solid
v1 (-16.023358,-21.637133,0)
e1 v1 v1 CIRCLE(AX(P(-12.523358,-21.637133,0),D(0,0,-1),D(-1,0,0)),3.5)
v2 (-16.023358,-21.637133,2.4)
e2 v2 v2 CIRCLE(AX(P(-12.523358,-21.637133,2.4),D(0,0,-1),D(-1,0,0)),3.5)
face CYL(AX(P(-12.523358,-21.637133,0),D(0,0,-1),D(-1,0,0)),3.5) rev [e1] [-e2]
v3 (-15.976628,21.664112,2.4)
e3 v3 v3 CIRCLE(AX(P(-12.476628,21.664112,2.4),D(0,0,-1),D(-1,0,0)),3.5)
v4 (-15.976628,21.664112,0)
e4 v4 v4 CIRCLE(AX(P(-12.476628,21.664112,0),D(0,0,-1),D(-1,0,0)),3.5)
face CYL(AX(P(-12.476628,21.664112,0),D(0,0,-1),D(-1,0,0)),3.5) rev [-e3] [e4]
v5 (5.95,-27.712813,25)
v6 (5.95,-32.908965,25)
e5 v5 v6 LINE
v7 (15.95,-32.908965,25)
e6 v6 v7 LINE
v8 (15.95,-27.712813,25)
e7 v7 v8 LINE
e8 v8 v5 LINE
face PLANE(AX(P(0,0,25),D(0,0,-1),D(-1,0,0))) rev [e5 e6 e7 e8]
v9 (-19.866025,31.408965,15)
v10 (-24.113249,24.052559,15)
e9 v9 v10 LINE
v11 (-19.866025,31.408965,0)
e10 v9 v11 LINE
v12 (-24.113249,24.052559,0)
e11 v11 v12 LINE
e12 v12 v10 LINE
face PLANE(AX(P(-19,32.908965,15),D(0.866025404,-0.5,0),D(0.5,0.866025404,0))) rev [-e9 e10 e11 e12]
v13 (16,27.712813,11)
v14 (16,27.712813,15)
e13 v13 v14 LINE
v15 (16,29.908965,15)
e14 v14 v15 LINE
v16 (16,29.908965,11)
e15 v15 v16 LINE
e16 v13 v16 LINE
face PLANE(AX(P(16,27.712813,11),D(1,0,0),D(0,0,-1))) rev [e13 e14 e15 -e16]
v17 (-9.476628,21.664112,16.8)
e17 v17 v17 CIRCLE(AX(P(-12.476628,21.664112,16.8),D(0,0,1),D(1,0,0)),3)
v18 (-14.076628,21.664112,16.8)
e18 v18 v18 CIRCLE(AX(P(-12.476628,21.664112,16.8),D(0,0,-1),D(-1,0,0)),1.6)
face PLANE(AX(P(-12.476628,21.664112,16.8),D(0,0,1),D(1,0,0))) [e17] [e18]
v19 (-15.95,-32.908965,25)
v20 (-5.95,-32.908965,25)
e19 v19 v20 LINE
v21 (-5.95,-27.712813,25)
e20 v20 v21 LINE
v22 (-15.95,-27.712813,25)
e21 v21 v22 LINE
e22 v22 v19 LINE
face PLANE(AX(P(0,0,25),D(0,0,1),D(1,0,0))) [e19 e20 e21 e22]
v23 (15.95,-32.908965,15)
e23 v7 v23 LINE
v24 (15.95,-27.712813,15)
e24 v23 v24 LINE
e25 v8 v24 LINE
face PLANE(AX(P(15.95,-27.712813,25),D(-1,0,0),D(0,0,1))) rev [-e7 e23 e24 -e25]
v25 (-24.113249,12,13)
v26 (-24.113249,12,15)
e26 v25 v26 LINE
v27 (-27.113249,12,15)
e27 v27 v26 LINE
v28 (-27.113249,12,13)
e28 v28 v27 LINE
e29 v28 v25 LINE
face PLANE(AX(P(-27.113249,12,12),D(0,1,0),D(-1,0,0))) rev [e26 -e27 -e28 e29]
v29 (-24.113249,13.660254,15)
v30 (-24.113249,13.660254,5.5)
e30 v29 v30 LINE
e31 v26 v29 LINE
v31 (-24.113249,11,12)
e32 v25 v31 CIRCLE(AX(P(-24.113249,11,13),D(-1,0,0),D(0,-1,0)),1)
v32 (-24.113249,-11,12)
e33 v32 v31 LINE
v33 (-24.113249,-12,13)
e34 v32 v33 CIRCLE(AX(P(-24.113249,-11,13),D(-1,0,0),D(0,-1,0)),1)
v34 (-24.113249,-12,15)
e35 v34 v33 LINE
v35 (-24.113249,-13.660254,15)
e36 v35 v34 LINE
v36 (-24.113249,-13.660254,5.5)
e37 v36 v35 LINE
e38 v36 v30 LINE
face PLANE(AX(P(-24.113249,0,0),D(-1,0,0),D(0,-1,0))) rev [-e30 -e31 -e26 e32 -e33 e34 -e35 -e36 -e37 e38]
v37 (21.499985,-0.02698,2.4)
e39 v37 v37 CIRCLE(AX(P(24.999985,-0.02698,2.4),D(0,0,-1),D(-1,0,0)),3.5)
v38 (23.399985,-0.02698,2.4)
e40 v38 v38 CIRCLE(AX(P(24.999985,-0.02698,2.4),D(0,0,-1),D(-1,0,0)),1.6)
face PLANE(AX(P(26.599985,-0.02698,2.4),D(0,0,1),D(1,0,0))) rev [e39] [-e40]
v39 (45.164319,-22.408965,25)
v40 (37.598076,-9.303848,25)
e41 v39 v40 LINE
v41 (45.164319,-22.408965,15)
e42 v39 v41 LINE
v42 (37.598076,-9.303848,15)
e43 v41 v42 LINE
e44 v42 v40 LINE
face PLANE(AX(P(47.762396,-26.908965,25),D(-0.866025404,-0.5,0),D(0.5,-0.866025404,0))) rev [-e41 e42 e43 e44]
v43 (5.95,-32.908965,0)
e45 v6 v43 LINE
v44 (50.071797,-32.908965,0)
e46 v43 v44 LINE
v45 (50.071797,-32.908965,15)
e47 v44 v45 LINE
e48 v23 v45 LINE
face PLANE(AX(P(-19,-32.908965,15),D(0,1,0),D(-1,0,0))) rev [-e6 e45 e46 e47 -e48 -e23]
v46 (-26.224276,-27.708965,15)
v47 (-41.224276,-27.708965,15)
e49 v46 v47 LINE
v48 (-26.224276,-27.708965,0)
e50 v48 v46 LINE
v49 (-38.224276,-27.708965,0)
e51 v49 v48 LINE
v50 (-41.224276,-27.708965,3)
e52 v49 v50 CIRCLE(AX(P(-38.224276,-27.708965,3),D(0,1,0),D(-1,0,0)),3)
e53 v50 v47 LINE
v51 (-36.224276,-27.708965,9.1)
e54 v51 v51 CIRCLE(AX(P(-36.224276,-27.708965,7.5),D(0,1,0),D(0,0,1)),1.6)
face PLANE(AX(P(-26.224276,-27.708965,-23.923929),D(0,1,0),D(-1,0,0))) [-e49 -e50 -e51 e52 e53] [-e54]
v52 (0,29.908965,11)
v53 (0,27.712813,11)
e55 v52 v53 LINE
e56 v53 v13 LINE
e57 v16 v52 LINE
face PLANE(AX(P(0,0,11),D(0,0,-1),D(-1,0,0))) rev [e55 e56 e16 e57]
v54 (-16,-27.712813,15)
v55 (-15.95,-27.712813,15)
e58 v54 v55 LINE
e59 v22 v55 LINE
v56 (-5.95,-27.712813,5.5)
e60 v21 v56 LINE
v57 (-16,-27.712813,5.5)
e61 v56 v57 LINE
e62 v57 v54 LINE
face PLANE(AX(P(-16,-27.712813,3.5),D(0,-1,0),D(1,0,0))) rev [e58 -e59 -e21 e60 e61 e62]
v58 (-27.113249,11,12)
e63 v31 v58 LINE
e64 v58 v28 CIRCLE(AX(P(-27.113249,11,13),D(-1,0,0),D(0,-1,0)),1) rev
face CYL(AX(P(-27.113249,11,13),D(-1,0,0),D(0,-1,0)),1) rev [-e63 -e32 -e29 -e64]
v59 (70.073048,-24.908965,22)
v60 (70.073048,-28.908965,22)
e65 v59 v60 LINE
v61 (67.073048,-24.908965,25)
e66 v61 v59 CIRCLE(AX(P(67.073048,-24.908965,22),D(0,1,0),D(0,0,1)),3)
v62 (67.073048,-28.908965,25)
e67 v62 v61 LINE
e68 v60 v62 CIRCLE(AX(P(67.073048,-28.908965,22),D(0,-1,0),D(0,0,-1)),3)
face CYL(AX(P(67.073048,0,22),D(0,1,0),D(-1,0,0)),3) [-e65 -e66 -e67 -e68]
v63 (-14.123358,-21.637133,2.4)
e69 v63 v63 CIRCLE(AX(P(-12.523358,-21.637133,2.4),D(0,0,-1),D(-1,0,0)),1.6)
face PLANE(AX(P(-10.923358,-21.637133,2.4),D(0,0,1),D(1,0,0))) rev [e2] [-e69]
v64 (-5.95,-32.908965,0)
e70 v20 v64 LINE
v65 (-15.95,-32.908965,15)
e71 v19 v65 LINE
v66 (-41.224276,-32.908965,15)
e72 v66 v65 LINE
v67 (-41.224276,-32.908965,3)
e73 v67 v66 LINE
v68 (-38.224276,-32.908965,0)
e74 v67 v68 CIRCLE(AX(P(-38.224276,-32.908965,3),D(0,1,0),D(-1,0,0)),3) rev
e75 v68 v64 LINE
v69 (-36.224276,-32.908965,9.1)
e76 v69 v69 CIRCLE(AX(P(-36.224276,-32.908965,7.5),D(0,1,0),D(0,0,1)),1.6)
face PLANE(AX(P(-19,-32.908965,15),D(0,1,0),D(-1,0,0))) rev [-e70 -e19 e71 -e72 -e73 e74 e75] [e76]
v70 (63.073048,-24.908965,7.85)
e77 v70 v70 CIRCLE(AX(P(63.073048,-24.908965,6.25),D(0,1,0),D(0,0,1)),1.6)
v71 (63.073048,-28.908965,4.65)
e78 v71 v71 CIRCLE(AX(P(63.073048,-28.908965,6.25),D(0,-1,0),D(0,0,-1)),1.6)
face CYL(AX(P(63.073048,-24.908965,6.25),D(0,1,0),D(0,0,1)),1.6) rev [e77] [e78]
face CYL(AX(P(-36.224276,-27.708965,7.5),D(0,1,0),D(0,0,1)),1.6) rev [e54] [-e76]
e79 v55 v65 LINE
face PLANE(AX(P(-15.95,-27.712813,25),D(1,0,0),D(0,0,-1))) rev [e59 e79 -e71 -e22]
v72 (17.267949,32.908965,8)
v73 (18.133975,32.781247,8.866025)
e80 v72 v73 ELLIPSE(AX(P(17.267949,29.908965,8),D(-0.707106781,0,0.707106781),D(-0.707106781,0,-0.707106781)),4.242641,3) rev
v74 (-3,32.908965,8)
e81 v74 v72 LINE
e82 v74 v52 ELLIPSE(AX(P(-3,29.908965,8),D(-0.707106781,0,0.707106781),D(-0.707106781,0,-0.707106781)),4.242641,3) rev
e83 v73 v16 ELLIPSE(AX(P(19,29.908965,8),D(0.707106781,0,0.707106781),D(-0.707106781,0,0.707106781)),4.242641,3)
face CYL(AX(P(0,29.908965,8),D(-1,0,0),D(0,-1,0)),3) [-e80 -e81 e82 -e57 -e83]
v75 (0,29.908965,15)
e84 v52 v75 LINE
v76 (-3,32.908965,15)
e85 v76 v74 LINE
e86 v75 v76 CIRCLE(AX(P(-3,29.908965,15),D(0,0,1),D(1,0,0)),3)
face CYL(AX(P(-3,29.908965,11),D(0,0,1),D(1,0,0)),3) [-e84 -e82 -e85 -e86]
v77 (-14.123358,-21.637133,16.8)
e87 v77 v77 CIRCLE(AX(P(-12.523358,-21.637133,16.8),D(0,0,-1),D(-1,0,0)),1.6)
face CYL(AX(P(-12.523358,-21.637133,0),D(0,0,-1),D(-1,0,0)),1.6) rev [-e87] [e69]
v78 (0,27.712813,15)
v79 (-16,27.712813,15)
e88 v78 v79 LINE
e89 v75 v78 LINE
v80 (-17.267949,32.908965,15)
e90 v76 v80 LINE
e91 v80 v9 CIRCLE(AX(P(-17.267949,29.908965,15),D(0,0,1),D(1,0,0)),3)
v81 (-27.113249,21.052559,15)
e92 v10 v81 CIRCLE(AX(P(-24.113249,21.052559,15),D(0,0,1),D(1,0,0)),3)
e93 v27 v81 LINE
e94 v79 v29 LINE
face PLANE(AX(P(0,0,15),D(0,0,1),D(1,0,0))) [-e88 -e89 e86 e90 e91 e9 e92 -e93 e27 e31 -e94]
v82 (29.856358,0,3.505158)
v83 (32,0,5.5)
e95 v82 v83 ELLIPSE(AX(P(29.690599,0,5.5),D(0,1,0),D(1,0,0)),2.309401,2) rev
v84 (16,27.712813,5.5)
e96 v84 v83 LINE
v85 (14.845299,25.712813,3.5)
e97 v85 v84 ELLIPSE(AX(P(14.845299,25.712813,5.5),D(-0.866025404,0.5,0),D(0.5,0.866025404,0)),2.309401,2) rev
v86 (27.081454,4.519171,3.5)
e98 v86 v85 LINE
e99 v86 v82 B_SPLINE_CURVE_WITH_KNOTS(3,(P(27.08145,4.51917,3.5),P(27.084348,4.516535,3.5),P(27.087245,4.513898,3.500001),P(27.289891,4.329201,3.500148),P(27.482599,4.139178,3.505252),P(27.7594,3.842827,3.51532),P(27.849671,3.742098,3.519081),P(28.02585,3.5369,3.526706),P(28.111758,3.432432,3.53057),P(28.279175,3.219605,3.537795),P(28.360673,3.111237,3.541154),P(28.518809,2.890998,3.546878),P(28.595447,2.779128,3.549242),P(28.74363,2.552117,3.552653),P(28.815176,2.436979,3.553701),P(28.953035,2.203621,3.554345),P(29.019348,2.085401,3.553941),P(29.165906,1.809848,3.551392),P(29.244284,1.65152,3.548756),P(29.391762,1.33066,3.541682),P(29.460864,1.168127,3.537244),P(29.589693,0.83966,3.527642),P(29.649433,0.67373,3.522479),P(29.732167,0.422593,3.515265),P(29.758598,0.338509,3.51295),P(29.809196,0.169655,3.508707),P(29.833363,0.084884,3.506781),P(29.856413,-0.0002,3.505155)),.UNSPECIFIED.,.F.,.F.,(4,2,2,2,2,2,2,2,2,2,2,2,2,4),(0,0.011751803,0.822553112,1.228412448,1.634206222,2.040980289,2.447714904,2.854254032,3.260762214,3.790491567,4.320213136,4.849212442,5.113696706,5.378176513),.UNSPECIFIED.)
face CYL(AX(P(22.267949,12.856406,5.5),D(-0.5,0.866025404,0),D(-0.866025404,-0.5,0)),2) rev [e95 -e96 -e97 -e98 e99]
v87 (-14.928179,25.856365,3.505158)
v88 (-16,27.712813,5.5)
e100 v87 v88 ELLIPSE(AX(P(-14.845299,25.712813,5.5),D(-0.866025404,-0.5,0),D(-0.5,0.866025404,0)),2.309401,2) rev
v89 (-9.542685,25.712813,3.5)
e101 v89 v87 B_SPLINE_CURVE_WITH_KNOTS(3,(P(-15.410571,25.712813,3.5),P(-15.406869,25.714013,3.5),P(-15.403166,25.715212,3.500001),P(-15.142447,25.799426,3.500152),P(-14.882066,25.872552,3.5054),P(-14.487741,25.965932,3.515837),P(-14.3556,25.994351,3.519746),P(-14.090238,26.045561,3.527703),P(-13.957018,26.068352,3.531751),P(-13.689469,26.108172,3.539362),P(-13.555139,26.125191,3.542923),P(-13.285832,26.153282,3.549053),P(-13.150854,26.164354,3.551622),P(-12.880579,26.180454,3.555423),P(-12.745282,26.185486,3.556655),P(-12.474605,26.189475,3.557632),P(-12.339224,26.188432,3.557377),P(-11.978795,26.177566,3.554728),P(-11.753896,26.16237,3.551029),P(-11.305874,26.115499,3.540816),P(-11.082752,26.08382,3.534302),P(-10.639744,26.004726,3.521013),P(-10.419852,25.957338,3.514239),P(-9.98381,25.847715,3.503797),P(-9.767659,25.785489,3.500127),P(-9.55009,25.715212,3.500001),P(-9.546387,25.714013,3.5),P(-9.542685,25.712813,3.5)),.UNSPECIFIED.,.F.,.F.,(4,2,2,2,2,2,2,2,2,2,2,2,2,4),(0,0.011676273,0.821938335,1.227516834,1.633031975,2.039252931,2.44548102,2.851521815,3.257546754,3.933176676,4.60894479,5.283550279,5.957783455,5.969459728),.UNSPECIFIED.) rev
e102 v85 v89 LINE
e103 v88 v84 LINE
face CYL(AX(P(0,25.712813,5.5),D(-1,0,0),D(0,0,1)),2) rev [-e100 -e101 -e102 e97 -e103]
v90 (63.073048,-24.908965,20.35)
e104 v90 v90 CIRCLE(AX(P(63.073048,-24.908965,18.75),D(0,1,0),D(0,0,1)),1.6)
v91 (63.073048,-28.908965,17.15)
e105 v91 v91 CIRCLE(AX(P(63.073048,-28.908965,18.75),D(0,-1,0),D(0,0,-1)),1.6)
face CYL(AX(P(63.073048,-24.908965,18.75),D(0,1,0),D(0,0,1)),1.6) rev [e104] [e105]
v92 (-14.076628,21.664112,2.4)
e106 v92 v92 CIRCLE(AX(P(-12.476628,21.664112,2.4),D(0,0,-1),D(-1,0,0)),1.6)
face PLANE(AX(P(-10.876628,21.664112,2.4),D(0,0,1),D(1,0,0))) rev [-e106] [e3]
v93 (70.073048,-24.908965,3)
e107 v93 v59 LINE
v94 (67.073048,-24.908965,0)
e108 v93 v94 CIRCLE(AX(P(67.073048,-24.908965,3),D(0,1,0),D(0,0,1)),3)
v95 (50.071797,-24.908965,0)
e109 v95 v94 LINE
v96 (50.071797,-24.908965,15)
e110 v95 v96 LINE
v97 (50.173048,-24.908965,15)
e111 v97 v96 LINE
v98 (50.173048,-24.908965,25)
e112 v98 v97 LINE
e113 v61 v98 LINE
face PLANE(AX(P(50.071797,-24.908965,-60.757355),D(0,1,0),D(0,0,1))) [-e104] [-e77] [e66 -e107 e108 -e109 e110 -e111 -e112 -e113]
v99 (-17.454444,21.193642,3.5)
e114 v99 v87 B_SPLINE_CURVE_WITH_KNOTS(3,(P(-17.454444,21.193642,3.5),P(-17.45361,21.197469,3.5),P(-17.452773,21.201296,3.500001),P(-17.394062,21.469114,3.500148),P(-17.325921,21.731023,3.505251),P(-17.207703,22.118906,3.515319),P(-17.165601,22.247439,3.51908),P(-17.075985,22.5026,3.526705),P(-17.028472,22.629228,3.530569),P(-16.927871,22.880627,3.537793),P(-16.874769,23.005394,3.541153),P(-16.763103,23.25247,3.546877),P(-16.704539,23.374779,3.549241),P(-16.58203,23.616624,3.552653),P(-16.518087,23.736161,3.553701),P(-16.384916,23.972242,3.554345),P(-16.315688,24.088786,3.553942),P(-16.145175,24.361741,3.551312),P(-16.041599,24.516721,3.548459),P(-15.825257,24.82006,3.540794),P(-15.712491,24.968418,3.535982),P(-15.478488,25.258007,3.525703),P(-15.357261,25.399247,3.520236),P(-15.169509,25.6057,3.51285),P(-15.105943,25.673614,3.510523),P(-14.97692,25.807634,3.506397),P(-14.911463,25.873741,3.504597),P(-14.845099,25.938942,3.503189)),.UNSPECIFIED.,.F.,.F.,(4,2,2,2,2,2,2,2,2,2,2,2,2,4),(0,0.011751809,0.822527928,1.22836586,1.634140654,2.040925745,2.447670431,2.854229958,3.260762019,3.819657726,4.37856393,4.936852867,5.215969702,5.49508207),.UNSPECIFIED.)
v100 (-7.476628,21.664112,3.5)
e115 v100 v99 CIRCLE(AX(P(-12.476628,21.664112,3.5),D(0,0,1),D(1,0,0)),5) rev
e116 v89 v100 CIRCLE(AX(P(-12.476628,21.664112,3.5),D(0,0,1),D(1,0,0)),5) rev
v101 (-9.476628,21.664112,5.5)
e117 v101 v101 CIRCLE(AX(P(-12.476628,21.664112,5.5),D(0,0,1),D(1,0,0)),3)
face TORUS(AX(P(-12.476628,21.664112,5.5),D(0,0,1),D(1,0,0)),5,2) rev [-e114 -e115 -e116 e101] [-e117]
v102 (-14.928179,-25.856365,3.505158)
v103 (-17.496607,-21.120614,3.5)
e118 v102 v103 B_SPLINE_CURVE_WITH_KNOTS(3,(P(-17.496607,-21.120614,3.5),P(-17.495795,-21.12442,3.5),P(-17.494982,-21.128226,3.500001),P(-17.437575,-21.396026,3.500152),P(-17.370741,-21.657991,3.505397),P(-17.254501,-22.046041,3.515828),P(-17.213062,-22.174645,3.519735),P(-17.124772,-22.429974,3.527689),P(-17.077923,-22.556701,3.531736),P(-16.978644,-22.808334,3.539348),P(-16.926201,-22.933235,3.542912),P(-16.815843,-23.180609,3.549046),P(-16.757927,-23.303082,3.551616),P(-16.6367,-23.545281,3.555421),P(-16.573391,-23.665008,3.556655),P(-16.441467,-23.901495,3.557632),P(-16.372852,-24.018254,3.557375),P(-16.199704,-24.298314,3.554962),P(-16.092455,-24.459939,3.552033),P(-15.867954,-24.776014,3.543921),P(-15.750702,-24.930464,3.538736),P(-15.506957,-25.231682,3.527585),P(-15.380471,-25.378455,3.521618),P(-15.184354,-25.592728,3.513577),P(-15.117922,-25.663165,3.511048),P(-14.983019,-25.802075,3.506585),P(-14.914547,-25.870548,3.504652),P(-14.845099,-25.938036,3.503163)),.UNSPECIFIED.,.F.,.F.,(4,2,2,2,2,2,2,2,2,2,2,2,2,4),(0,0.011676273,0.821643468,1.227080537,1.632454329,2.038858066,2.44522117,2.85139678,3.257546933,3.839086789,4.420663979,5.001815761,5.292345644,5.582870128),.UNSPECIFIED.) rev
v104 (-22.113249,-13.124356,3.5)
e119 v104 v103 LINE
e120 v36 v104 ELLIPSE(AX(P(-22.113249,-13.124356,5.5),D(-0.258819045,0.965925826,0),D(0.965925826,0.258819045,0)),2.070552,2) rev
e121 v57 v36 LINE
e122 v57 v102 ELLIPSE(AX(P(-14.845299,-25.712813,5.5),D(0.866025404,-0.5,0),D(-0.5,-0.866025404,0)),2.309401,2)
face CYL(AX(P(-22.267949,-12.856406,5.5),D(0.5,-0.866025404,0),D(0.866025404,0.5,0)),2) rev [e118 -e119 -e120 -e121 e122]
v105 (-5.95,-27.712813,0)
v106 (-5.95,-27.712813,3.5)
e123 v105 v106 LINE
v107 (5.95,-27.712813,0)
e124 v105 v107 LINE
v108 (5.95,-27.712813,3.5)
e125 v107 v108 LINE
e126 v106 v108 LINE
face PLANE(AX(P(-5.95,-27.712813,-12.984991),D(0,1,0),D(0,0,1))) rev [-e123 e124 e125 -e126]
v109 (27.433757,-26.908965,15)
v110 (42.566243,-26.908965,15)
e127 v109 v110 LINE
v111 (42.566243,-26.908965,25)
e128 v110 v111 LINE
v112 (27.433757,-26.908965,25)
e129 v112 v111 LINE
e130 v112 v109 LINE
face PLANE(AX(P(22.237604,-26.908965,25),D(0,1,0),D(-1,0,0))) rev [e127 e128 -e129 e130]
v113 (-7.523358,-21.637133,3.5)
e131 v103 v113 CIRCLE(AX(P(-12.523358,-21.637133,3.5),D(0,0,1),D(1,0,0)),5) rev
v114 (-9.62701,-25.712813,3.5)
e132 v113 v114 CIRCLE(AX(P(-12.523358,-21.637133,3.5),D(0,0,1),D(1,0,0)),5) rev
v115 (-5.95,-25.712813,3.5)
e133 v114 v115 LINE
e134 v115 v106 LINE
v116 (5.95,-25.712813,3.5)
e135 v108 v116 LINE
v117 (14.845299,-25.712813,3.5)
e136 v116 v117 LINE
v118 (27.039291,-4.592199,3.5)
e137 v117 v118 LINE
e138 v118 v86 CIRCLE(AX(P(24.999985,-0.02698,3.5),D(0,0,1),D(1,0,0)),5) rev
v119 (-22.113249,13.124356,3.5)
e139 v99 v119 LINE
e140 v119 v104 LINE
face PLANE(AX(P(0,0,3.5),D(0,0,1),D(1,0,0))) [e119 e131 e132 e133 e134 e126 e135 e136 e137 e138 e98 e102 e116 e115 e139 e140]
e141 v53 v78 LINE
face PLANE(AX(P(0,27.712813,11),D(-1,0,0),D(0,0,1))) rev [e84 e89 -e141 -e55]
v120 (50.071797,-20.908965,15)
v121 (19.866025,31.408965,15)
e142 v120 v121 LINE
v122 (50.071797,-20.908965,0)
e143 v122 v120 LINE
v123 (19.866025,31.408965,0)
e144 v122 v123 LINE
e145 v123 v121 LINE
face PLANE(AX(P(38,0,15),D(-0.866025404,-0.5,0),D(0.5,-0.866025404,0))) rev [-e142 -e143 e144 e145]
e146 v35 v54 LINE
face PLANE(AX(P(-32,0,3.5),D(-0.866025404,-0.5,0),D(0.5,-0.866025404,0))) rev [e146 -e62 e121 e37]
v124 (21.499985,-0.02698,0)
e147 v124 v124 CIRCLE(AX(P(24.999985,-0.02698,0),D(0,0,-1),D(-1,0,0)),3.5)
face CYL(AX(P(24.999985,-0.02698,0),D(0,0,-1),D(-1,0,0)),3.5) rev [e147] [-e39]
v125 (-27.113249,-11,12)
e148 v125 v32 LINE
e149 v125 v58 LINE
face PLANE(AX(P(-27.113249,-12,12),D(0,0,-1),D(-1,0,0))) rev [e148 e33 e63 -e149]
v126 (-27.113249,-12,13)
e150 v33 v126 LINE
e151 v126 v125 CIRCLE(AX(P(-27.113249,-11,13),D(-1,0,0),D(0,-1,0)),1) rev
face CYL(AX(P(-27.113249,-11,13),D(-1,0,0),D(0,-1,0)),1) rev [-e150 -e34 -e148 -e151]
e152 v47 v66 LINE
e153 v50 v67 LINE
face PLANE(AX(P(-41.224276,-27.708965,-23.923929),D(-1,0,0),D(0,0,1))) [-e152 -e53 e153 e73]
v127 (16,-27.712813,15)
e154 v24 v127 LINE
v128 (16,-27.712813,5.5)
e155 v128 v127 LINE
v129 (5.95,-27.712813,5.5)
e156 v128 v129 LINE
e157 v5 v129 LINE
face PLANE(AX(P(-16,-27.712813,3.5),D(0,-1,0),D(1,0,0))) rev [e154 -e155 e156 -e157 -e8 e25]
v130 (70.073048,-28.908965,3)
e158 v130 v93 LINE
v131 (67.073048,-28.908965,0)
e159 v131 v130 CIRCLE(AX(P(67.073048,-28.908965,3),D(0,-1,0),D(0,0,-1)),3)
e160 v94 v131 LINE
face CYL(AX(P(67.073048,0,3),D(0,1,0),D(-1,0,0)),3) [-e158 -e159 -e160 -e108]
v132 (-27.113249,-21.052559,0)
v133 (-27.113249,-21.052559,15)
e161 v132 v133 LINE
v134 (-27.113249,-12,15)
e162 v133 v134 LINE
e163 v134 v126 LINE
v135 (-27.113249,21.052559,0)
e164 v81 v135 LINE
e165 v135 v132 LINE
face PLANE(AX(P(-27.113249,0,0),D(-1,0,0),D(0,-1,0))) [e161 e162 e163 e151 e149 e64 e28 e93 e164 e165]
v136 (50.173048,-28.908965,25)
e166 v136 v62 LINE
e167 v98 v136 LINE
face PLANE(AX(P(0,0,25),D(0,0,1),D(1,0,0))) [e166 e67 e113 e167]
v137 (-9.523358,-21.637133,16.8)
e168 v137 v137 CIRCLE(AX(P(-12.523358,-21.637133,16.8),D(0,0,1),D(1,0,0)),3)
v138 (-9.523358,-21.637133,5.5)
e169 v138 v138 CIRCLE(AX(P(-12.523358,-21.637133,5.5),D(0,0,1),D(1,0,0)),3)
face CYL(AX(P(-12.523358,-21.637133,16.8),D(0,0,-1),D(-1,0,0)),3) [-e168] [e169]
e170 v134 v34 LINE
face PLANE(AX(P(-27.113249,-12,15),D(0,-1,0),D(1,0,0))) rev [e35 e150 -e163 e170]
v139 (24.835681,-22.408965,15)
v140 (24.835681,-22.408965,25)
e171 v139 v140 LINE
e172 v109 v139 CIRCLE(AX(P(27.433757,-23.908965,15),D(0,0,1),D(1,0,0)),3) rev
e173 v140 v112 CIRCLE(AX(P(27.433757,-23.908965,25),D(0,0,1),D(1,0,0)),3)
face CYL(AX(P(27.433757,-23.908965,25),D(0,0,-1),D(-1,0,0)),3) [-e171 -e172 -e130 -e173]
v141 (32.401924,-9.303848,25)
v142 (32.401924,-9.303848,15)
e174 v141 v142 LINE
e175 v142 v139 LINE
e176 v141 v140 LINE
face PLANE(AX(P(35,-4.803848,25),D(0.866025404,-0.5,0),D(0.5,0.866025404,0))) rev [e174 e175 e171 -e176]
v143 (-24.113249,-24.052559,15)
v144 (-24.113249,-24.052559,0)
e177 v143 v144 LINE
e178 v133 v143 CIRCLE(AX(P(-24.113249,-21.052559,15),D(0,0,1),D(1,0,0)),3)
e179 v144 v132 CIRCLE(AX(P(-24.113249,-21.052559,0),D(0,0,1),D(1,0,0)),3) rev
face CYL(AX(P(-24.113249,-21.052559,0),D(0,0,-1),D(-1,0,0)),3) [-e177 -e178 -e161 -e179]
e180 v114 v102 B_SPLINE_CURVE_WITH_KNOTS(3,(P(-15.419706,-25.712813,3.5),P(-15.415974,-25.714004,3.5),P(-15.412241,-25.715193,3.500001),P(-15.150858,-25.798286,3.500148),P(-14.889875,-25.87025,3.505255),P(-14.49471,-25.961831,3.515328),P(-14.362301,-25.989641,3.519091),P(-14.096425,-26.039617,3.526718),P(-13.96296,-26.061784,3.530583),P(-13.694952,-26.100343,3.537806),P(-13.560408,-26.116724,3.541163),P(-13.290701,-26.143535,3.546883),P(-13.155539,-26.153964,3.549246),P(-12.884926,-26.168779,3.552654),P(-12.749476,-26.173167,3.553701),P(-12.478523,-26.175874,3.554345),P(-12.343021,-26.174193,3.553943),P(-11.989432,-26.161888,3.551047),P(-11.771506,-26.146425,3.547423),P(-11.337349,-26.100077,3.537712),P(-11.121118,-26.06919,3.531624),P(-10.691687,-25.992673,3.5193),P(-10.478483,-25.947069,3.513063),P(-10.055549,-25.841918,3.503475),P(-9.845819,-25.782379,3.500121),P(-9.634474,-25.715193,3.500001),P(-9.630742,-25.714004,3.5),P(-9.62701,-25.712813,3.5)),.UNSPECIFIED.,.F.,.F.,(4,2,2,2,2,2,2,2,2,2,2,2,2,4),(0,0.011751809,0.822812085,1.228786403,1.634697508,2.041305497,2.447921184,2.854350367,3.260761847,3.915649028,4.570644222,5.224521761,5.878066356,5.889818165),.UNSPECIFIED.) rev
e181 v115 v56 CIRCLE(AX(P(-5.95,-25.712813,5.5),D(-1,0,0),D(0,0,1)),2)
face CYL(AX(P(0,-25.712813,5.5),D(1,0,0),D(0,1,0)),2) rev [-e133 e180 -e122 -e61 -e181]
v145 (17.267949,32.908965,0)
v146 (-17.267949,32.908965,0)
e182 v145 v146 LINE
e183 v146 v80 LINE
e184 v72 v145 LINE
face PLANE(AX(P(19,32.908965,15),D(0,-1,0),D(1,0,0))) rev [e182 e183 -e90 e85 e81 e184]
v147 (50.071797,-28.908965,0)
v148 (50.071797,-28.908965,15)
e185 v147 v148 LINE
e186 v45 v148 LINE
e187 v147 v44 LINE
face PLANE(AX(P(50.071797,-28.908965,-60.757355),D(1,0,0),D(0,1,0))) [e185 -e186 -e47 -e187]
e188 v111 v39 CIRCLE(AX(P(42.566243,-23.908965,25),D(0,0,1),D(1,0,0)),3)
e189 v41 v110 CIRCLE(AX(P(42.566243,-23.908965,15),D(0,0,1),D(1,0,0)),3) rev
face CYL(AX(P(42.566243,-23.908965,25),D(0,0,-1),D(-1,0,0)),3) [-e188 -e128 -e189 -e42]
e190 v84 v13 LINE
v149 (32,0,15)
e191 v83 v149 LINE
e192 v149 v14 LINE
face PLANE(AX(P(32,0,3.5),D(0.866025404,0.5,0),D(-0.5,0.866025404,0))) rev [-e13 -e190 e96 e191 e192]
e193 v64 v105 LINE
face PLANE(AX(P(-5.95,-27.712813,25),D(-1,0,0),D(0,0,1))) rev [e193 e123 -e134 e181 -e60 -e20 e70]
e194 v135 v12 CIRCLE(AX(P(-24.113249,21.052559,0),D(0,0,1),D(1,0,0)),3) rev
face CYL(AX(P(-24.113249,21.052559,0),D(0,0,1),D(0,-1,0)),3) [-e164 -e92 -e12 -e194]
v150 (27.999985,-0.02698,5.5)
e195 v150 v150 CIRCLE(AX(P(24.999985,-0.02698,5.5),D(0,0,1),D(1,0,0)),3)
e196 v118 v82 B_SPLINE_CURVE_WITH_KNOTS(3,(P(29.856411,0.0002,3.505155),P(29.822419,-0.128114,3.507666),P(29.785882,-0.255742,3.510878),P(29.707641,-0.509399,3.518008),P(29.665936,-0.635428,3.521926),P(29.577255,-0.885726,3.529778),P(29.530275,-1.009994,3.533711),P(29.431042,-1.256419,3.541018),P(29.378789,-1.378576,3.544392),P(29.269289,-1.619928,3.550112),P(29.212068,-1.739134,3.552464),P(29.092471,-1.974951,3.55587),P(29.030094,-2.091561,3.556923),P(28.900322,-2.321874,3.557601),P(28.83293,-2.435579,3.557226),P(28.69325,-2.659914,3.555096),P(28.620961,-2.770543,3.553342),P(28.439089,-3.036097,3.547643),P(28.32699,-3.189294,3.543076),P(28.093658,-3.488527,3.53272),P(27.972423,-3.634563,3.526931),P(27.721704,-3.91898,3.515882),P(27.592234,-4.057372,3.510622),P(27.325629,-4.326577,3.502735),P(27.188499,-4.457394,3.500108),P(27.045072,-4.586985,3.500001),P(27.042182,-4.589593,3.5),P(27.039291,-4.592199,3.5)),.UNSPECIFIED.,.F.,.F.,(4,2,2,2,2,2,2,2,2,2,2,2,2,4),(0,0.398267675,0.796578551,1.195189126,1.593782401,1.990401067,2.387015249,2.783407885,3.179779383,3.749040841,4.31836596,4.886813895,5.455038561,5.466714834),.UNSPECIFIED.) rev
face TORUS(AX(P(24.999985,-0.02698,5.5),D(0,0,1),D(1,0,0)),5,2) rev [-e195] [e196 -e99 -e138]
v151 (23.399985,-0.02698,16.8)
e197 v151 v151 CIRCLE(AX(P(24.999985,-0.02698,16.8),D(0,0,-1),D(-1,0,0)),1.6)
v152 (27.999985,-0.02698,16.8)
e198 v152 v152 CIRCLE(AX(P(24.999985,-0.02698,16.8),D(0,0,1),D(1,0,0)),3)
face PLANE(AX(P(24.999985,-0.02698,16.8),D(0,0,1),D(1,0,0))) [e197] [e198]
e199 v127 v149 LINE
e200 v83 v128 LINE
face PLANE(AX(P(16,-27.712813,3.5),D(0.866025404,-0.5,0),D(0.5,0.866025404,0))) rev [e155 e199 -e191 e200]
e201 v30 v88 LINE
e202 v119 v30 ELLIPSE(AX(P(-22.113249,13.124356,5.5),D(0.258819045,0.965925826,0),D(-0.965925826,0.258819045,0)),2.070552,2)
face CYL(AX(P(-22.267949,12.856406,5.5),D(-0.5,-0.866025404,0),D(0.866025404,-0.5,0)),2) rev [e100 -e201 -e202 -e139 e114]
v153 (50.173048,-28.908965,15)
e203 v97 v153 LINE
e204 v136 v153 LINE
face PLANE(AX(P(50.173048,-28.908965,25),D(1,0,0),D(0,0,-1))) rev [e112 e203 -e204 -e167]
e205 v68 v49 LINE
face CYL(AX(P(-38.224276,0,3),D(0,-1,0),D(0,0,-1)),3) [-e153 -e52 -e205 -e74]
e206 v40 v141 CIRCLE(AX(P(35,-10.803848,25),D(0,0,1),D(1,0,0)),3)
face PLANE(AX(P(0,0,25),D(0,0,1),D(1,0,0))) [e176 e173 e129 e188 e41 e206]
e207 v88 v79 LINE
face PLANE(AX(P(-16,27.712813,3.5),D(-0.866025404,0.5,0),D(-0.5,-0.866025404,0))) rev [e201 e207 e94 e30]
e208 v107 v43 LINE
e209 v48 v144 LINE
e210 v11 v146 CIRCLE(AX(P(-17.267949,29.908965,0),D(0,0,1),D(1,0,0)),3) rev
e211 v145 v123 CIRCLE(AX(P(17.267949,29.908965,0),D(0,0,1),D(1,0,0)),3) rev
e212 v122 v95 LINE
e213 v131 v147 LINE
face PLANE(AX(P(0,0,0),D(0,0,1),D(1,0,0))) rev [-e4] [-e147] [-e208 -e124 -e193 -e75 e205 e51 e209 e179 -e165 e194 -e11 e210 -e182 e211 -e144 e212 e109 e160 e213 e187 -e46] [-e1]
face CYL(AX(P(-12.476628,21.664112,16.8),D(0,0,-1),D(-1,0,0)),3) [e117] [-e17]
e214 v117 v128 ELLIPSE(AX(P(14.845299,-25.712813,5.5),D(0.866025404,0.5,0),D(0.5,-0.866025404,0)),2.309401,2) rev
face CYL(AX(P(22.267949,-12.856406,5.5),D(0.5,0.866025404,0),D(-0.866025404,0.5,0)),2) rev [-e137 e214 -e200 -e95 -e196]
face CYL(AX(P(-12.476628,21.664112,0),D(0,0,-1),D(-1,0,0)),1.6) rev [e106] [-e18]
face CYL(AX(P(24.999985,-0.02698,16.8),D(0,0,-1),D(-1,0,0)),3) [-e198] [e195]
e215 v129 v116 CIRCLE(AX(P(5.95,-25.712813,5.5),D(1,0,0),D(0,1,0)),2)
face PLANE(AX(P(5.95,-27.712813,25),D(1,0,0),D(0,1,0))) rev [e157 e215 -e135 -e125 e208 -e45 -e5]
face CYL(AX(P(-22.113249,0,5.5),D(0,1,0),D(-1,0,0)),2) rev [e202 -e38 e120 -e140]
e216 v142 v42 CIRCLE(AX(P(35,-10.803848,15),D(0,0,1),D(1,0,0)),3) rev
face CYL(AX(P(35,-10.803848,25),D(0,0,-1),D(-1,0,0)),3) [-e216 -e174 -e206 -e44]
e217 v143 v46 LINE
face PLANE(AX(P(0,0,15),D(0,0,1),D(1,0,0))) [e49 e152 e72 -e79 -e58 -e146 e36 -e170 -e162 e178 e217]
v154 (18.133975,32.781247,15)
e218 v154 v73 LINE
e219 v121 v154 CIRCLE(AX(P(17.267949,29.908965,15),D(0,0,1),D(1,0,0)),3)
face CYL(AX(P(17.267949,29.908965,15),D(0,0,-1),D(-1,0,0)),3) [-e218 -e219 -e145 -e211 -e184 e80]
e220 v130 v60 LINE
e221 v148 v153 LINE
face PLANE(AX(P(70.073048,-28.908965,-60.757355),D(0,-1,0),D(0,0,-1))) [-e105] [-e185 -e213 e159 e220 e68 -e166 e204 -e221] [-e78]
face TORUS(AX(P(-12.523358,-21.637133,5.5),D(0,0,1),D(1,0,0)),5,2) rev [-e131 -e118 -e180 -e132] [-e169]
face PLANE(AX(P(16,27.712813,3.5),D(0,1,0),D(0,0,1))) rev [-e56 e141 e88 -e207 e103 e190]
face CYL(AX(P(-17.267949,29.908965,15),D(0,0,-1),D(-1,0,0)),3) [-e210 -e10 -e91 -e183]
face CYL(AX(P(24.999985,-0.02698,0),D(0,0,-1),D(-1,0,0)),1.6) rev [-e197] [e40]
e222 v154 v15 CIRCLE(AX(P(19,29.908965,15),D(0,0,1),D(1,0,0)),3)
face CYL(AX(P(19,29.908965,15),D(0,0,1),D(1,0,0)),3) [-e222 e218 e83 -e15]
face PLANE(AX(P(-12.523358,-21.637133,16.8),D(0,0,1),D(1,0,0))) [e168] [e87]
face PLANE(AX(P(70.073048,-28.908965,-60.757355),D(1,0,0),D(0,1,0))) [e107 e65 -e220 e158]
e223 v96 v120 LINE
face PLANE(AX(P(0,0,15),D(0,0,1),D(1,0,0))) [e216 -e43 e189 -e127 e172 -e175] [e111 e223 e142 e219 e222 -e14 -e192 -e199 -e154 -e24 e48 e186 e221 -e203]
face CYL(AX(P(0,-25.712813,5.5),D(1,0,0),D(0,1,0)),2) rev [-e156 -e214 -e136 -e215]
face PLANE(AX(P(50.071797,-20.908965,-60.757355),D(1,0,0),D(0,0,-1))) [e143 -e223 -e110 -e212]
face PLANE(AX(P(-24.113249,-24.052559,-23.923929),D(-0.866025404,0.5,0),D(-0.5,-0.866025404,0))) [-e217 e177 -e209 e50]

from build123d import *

# Parameters (mm, degrees)
BOSS_EXTRU_1_DEPTH                                 = 15
ENL_V_MAT_EXTRU_1_DEPTH                            = 11.5
ESQUISSE3_R                                        = 3
BOSS_EXTRU_2_DEPTH                                 = 13.3
CHAMBRAGE_POUR_VIS_T_TE_RONDE_BOMB_E_M_D           = 3.2
CHAMBRAGE_POUR_VIS_T_TE_RONDE_BOMB_E_M_CBORE_D     = 7
CHAMBRAGE_POUR_VIS_T_TE_RONDE_BOMB_E_M_CBORE_DEPTH = 2.4
ENL_V_MAT_EXTRU_2_DEPTH                            = 52.998942297
ENL_V_MAT_EXTRU_2_DEPTH_BACK                       = 52.998942297
ESQUISSE6_W                                        = 26.083668392
ESQUISSE6_H                                        = 65.817930688
BOSS_EXTRU_3_DEPTH                                 = 15
ESQUISSE8_W                                        = 10
ESQUISSE8_H                                        = 5.196152423
ESQUISSE8_W_2                                      = 19.9
ESQUISSE8_H_2                                      = 4
BOSS_EXTRU_4_DEPTH                                 = 10
BOSS_EXTRU_5_DEPTH                                 = 10
ESQUISSE13_W                                       = 11.9
ESQUISSE13_H                                       = 5.196152423
ENL_V_MAT_EXTRU_3_DEPTH                            = 15
ESQUISSE14_W                                       = 16
ESQUISSE14_H                                       = 5.196152423
ENL_V_MAT_EXTRU_4_DEPTH                            = 4
BOSS_EXTRU_6_DEPTH                                 = 15
D_GAGEMENT_M32_D                                   = 3.2
D_GAGEMENT_M33_D                                   = 3.2
BOSS_EXTRU_7_DEPTH                                 = 3
CONG_1_R                                           = 3
CONG_2_R                                           = 1
CONG_3_R                                           = 2


with BuildPart() as part:
    # Esquisse1 → Boss.-Extru.1 (new body)
    with BuildSketch(Plane.XY):
        Polygon((38, 0), (19, 32.908965344), (-19, 32.908965344), (-38, 0), (-19, -32.908965344), (19, -32.908965344), align=None)
    extrude(amount=BOSS_EXTRU_1_DEPTH)

    # Esquisse2 → Enlèv. mat.-Extru.1 (cut)
    with BuildSketch(Plane.XY.offset(15)):
        Polygon((32, 0), (16, 27.712812921), (-16, 27.712812921), (-32, 0), (-16, -27.712812921), (16, -27.712812921), align=None)
    extrude(amount=-ENL_V_MAT_EXTRU_1_DEPTH, mode=Mode.SUBTRACT)

    # Esquisse3 → Boss.-Extru.2 (add)
    with BuildSketch(Plane.XY.offset(3.5)):
        with Locations((-12.523357671, -21.637132727)):
            Circle(ESQUISSE3_R)
        with Locations((-12.476627771, 21.664112247)):
            Circle(ESQUISSE3_R)
        with Locations((24.999985442, -0.02697952)):
            Circle(ESQUISSE3_R)
    extrude(amount=BOSS_EXTRU_2_DEPTH)

    # Chambrage pour vis à tête ronde bombée M31 (through all)
    with Locations(Plane(origin=(0, 0, 0), x_dir=(-1, 0, 0), z_dir=(0, 0, -1))):
        with Locations((12.476627771, 21.664112247), (12.523357671, -21.637132727), (-24.999985442, -0.02697952)):
            CounterBoreHole(CHAMBRAGE_POUR_VIS_T_TE_RONDE_BOMB_E_M_D / 2, CHAMBRAGE_POUR_VIS_T_TE_RONDE_BOMB_E_M_CBORE_D / 2, CHAMBRAGE_POUR_VIS_T_TE_RONDE_BOMB_E_M_CBORE_DEPTH)

    # Esquisse6 → Enlèv. mat.-Extru.2 (cut, two sides: drawn at the far end of the back side and taken through both)
    with BuildSketch(Plane.XY.offset(3.5).offset(-ENL_V_MAT_EXTRU_2_DEPTH_BACK)):
        with Locations((-37.15508285, 0)):
            Rectangle(ESQUISSE6_W, ESQUISSE6_H)
    extrude(amount=ENL_V_MAT_EXTRU_2_DEPTH + ENL_V_MAT_EXTRU_2_DEPTH_BACK, mode=Mode.SUBTRACT)

    # Esquisse7 → Boss.-Extru.3 (add)
    with BuildSketch(Plane.XY.offset(15)):
        Polygon((38, 0), (19, -32.908965344), (50.07179677, -32.908965344), (50.07179677, -28.908965344), (70.073047903, -28.908965344), (70.073047903, -24.908965344), (50.07179677, -24.908965344), (50.07179677, -20.908965344), align=None)
    extrude(amount=-BOSS_EXTRU_3_DEPTH)

    # Esquisse8 → Boss.-Extru.4 (add)
    with BuildSketch(Plane.XY.offset(15)):
        with Locations((-10.95, -30.310889133)):
            Rectangle(ESQUISSE8_W, ESQUISSE8_H)
        with Locations((10.95, -30.310889133)):
            Rectangle(ESQUISSE8_W, ESQUISSE8_H)
        with Locations((60.123047903, -26.908965344)):
            Rectangle(ESQUISSE8_W_2, ESQUISSE8_H_2)
    extrude(amount=BOSS_EXTRU_4_DEPTH)

    # Esquisse12 → Boss.-Extru.5 (add)
    with BuildSketch(Plane.XY.offset(15)):
        Polygon((47.762395693, -26.908965344), (35, -4.803847577), (22.237604307, -26.908965344), align=None)
    extrude(amount=BOSS_EXTRU_5_DEPTH)

    # Esquisse13 → Enlèv. mat.-Extru.3 (cut)
    with BuildSketch(Plane.XY.offset(15)):
        with Locations((0, -30.310889133)):
            Rectangle(ESQUISSE13_W, ESQUISSE13_H)
    extrude(amount=-ENL_V_MAT_EXTRU_3_DEPTH, mode=Mode.SUBTRACT)

    # Esquisse14 → Enlèv. mat.-Extru.4 (cut)
    with BuildSketch(Plane.XY.offset(15)):
        with Locations((8, 30.310889133)):
            Rectangle(ESQUISSE14_W, ESQUISSE14_H)
    extrude(amount=-ENL_V_MAT_EXTRU_4_DEPTH, mode=Mode.SUBTRACT)

    # Esquisse15 → Boss.-Extru.6 (add)
    with BuildSketch(Plane.XY.offset(15)):
        Polygon((-24.113248654, -24.052558883), (-26.224275908, -27.708965344), (-41.224275908, -27.708965344), (-41.224275908, -32.908965344), (-19, -32.908965344), align=None)
    extrude(amount=-BOSS_EXTRU_6_DEPTH)

    # Dégagement M32 (through all)
    with Locations(Plane(origin=(0, -27.708965344, 0), x_dir=(1, 0, 0), z_dir=(0, 1, 0))):
        with Locations((-36.224275908, -7.5)):
            Hole(D_GAGEMENT_M32_D / 2)

    # Dégagement M33 (through all)
    with Locations(Plane(origin=(0, -24.908965344, 0), x_dir=(1, 0, 0), z_dir=(0, 1, 0))):
        with Locations((63.073047903, -6.25), (63.073047903, -18.75)):
            Hole(D_GAGEMENT_M33_D / 2)

    # Esquisse22 → Boss.-Extru.7 (add)
    with BuildSketch(Plane.ZY.offset(24.113248654)):
        Polygon((15, -12), (12, -12), (12, 12), (15, 12), (15, 24.052558883), (0, 24.052558883), (0, -24.052558883), (15, -24.052558883), align=None)
    extrude(amount=BOSS_EXTRU_7_DEPTH)

    # Congé1
    # the kernel refuses this fillet: 3 mm, written as the material it takes off along each edge
    with BuildSketch(Plane(origin=(47.762395693, -26.908965344, 15), x_dir=(-0.4999999999999992, 0.8660254037844389, 0), z_dir=(0, 0, 1)), Plane(origin=(22.237604307, -26.908965344, 15), x_dir=(1, 0, 0), z_dir=(0, 0, 1))) as cong_1_piece_1:
        with BuildLine():
            CenterArc((CONG_1_R * 1.73205080757, CONG_1_R), CONG_1_R, 150, 120)
            Line((CONG_1_R * 0.866025403784, CONG_1_R * 1.5), (0, 0))
            Line((0, 0), (CONG_1_R * 1.73205080757, 0))
        make_face()
    extrude(amount=22.990381057, mode=Mode.SUBTRACT)
    with BuildSketch(Plane(origin=(35, -4.803847577, 15), x_dir=(0.49999999999999956, -0.8660254037844389, 0), z_dir=(0, 0, 1))) as cong_1_piece_2:
        with BuildLine():
            CenterArc((CONG_1_R * 1.73205080757, -CONG_1_R), CONG_1_R, 90, 120)
            Line((CONG_1_R * 0.866025403784, -CONG_1_R * 1.5), (0, 0))
            Line((0, 0), (CONG_1_R * 1.73205080757, 0))
        make_face()
    extrude(amount=22.990381057, mode=Mode.SUBTRACT)
    with BuildSketch(Plane(origin=(-19, 32.908965344, -4.330127019), x_dir=(1, 0, 0), z_dir=(0, 0, 1)), Plane(origin=(19, 32.908965344, -4.330127019), x_dir=(0.500000000000001, -0.866025403784438, 0), z_dir=(0, 0, 1))) as cong_1_piece_3:
        with BuildLine():
            CenterArc((CONG_1_R * 0.57735026919, -CONG_1_R), CONG_1_R, 90, 60)
            Line((-CONG_1_R * 0.288675134595, -CONG_1_R * 0.5), (0, 0))
            Line((0, 0), (CONG_1_R * 0.57735026919, 0))
        make_face()
    extrude(amount=23.660254038, mode=Mode.SUBTRACT)
    with BuildSketch(Plane(origin=(70.073047903, -36.408965344, 0), x_dir=(-1, 0, 0), z_dir=(0, 1, 0))) as cong_1_piece_4:
        with BuildLine():
            CenterArc((CONG_1_R, CONG_1_R), CONG_1_R, 180, 90)
            Line((0, CONG_1_R), (0, 0))
            Line((0, 0), (CONG_1_R, 0))
        make_face()
    extrude(amount=19, mode=Mode.SUBTRACT)
    with BuildSketch(Plane(origin=(70.073047903, -17.408965344, 25), x_dir=(0, 0, -1), z_dir=(0, -1, 0))) as cong_1_piece_5:
        with BuildLine():
            CenterArc((CONG_1_R, -CONG_1_R), CONG_1_R, 90, 90)
            Line((0, -CONG_1_R), (0, 0))
            Line((0, 0), (CONG_1_R, 0))
        make_face()
    extrude(amount=19, mode=Mode.SUBTRACT)
    with BuildSketch(Plane(origin=(16, 32.908965344, 22.5), x_dir=(1, 0, 0), z_dir=(0, 0, -1))) as cong_1_piece_6:
        with BuildLine():
            CenterArc((CONG_1_R, CONG_1_R), CONG_1_R, 180, 90)
            Line((0, CONG_1_R), (0, 0))
            Line((0, 0), (CONG_1_R, 0))
        make_face()
    extrude(amount=11.5, mode=Mode.SUBTRACT)
    with BuildSketch(Plane(origin=(16, 32.908965344, 11), x_dir=(0, 0, -1), z_dir=(-1, 0, 0))) as cong_1_piece_7:
        with BuildLine():
            CenterArc((CONG_1_R, CONG_1_R), CONG_1_R, 180, 90)
            Line((0, CONG_1_R), (0, 0))
            Line((0, 0), (CONG_1_R, 0))
        make_face()
    extrude(amount=16, mode=Mode.SUBTRACT)
    with BuildSketch(Plane(origin=(0, 32.908965344, 22.5), x_dir=(-1, 0, 0), z_dir=(0, 0, -1))) as cong_1_piece_8:
        with BuildLine():
            CenterArc((CONG_1_R, -CONG_1_R), CONG_1_R, 90, 90)
            Line((0, -CONG_1_R), (0, 0))
            Line((0, 0), (CONG_1_R, 0))
        make_face()
    extrude(amount=11.5, mode=Mode.SUBTRACT)
    with BuildSketch(Plane(origin=(-41.224275908, -20.208965344, 0), x_dir=(1, 0, 0), z_dir=(0, -1, 0))) as cong_1_piece_9:
        with BuildLine():
            CenterArc((CONG_1_R, CONG_1_R), CONG_1_R, 180, 90)
            Line((0, CONG_1_R), (0, 0))
            Line((0, 0), (CONG_1_R, 0))
        make_face()
    extrude(amount=20.2, mode=Mode.SUBTRACT)
    with BuildSketch(Plane(origin=(-27.113248654, 24.052558883, 22.5), x_dir=(1, 0, 0), z_dir=(0, 0, -1))) as cong_1_piece_10:
        with BuildLine():
            CenterArc((CONG_1_R, CONG_1_R), CONG_1_R, 180, 90)
            Line((0, CONG_1_R), (0, 0))
            Line((0, 0), (CONG_1_R, 0))
        make_face()
    extrude(amount=30, mode=Mode.SUBTRACT)
    with BuildSketch(Plane(origin=(-27.113248654, -24.052558883, -7.5), x_dir=(1, 0, 0), z_dir=(0, 0, 1))) as cong_1_piece_11_section:
        with BuildLine():
            CenterArc((CONG_1_R, CONG_1_R), CONG_1_R, 180, 90)
            Line((0, CONG_1_R), (0, 0))
            Line((0, 0), (CONG_1_R, 0))
        make_face()
    cong_1_piece_11 = extrude(amount=30, mode=Mode.PRIVATE)
    cong_1_piece_11 = split(cong_1_piece_11, bisect_by=Plane(origin=(-24.399476898, -24.548320744, 7.5), z_dir=(-0.866025403784445, 0.4999999999999892, 0)), keep=Keep.TOP, mode=Mode.PRIVATE)
    add(cong_1_piece_11, mode=Mode.SUBTRACT)
    with BuildSketch(Plane(origin=(23.5, 32.908965344, 11), x_dir=(0, 0, -1), z_dir=(-1, 0, 0))) as cong_1_piece_12a_section:
        with BuildLine():
            CenterArc((CONG_1_R, CONG_1_R), CONG_1_R, 180, 90)
            Line((0, CONG_1_R), (0, 0))
            Line((0, 0), (CONG_1_R, 0))
        make_face()
    cong_1_piece_12a = extrude(amount=23.5, mode=Mode.PRIVATE)
    cong_1_piece_12a = split(cong_1_piece_12a, bisect_by=Plane(origin=(16, 32.229780001, 10.320814657), z_dir=(1, 0, 0)), keep=Keep.TOP, mode=Mode.PRIVATE)
    with BuildSketch(Plane(origin=(16, 32.908965344, 22.5), x_dir=(1, 0, 0), z_dir=(0, 0, -1))) as cong_1_piece_12b_section:
        with BuildLine():
            CenterArc((CONG_1_R, CONG_1_R), CONG_1_R, 180, 90)
            Line((0, CONG_1_R), (0, 0))
            Line((0, 0), (CONG_1_R, 0))
        make_face()
    cong_1_piece_12b = extrude(amount=19, mode=Mode.PRIVATE)
    cong_1_piece_12b = split(cong_1_piece_12b, bisect_by=Plane(origin=(16.679185343, 32.229780001, 11), z_dir=(0, 0, -1)), keep=Keep.TOP, mode=Mode.PRIVATE)
    cong_1_piece_12 = cong_1_piece_12a & cong_1_piece_12b
    add(cong_1_piece_12, mode=Mode.SUBTRACT)
    with BuildSketch(Plane(origin=(0, 32.908965344, 22.5), x_dir=(-1, 0, 0), z_dir=(0, 0, -1))) as cong_1_piece_13a_section:
        with BuildLine():
            CenterArc((CONG_1_R, -CONG_1_R), CONG_1_R, 90, 90)
            Line((0, -CONG_1_R), (0, 0))
            Line((0, 0), (CONG_1_R, 0))
        make_face()
    cong_1_piece_13a = extrude(amount=19, mode=Mode.PRIVATE)
    cong_1_piece_13a = split(cong_1_piece_13a, bisect_by=Plane(origin=(-0.679185343, 32.229780001, 11), z_dir=(0, 0, -1)), keep=Keep.TOP, mode=Mode.PRIVATE)
    with BuildSketch(Plane(origin=(16, 32.908965344, 11), x_dir=(0, 0, -1), z_dir=(-1, 0, 0))) as cong_1_piece_13b_section:
        with BuildLine():
            CenterArc((CONG_1_R, CONG_1_R), CONG_1_R, 180, 90)
            Line((0, CONG_1_R), (0, 0))
            Line((0, 0), (CONG_1_R, 0))
        make_face()
    cong_1_piece_13b = extrude(amount=23.5, mode=Mode.PRIVATE)
    cong_1_piece_13b = split(cong_1_piece_13b, bisect_by=Plane(origin=(0, 32.229780001, 10.320814657), z_dir=(-1, 0, 0)), keep=Keep.TOP, mode=Mode.PRIVATE)
    cong_1_piece_13 = cong_1_piece_13a & cong_1_piece_13b
    add(cong_1_piece_13, mode=Mode.SUBTRACT)

    # Congé2
    cong_2_edges = [part.edges().sort_by_distance(p)[0] for p in [
        (-25.613248654, -12, 12),
        (-25.613248654, 12, 12),
    ]]
    fillet(cong_2_edges, radius=CONG_2_R)

    # Congé3
    # the kernel refuses this fillet: 2 mm, written as the material it adds along each edge
    with BuildSketch(Plane(origin=(5.95, -27.712812921, 3.5), x_dir=(0, 1, 0), z_dir=(1, 0, 0)), Plane(origin=(-21, -27.712812921, 3.5), x_dir=(0, 1, 0), z_dir=(1, 0, 0))) as cong_3_piece_1:
        with BuildLine():
            CenterArc((CONG_3_R, CONG_3_R), CONG_3_R, 180, 90)
            Line((0, CONG_3_R), (0, 0))
            Line((0, 0), (CONG_3_R, 0))
        make_face()
    extrude(amount=15.05)
    with BuildSketch(Plane(origin=(13.5, -32.04293994, 3.5), x_dir=(-0.8660254037844388, 0.49999999999999994, 0), z_dir=(0.4999999999999999, 0.8660254037844387, 0)), Plane(origin=(21, 27.712812921, 3.5), x_dir=(0, -1, 0), z_dir=(-1, 0, 0)), Plane(origin=(34.5, -4.330127019, 3.5), x_dir=(-0.8660254037844385, -0.5000000000000004, 0), z_dir=(-0.5000000000000004, 0.8660254037844385, 0))) as cong_3_piece_2:
        with BuildLine():
            CenterArc((CONG_3_R, CONG_3_R), CONG_3_R, 180, 90)
            Line((0, CONG_3_R), (0, 0))
            Line((0, 0), (CONG_3_R, 0))
        make_face()
    extrude(amount=42)
    with BuildSketch(Plane(origin=(-13.5, 32.04293994, 3.5), x_dir=(0, 0, 1), z_dir=(-0.4999999999999998, -0.8660254037844389, 0))) as cong_3_piece_3:
        with BuildLine():
            CenterArc((CONG_3_R, -CONG_3_R), CONG_3_R, 90, 90)
            Line((0, -CONG_3_R), (0, 0))
            Line((0, 0), (CONG_3_R, 0))
        make_face()
    extrude(amount=26.226497308)
    with BuildSketch(Plane(origin=(-12.523357671, -21.637132727, 3.5), x_dir=(1, 0, 0), z_dir=(0, -1, 0))) as cong_3_piece_4:
        with BuildLine():
            CenterArc((3 + CONG_3_R, CONG_3_R), CONG_3_R, 180, 90)
            Line((3, CONG_3_R), (3, 0))
            Line((3, 0), (3 + CONG_3_R, 0))
        make_face()
    revolve(axis=Axis((-12.523357671, -21.637132727, 3.5), (0, 0, 1)))
    with BuildSketch(Plane(origin=(-12.476627771, 21.664112247, 3.5), x_dir=(1, 0, 0), z_dir=(0, -1, 0))) as cong_3_piece_5:
        with BuildLine():
            CenterArc((3 + CONG_3_R, CONG_3_R), CONG_3_R, 180, 90)
            Line((3, CONG_3_R), (3, 0))
            Line((3, 0), (3 + CONG_3_R, 0))
        make_face()
    revolve(axis=Axis((-12.476627771, 21.664112247, 3.5), (0, 0, 1)))
    with BuildSketch(Plane(origin=(24.999985442, -0.02697952, 3.5), x_dir=(1, 0, 0), z_dir=(0, -1, 0))) as cong_3_piece_6:
        with BuildLine():
            CenterArc((3 + CONG_3_R, CONG_3_R), CONG_3_R, 180, 90)
            Line((3, CONG_3_R), (3, 0))
            Line((3, 0), (3 + CONG_3_R, 0))
        make_face()
    revolve(axis=Axis((24.999985442, -0.02697952, 3.5), (0, 0, 1)))
    with BuildSketch(Plane(origin=(-26.613248654, -9.330127019, 3.5), x_dir=(0.8660254037844387, 0.4999999999999998, 0), z_dir=(0.4999999999999999, -0.8660254037844388, 0))) as cong_3_piece_7:
        with BuildLine():
            CenterArc((CONG_3_R, CONG_3_R), CONG_3_R, 180, 90)
            Line((0, CONG_3_R), (0, 0))
            Line((0, 0), (CONG_3_R, 0))
        make_face()
    extrude(amount=26.226497308)
    with BuildSketch(Plane(origin=(-24.113248654, -18.660254038, 3.5), x_dir=(0, 0, 1), z_dir=(0, 1, 0))) as cong_3_piece_8:
        with BuildLine():
            CenterArc((CONG_3_R, CONG_3_R), CONG_3_R, 180, 90)
            Line((0, CONG_3_R), (0, 0))
            Line((0, 0), (CONG_3_R, 0))
        make_face()
    extrude(amount=37.320508076)


solid = part.part
